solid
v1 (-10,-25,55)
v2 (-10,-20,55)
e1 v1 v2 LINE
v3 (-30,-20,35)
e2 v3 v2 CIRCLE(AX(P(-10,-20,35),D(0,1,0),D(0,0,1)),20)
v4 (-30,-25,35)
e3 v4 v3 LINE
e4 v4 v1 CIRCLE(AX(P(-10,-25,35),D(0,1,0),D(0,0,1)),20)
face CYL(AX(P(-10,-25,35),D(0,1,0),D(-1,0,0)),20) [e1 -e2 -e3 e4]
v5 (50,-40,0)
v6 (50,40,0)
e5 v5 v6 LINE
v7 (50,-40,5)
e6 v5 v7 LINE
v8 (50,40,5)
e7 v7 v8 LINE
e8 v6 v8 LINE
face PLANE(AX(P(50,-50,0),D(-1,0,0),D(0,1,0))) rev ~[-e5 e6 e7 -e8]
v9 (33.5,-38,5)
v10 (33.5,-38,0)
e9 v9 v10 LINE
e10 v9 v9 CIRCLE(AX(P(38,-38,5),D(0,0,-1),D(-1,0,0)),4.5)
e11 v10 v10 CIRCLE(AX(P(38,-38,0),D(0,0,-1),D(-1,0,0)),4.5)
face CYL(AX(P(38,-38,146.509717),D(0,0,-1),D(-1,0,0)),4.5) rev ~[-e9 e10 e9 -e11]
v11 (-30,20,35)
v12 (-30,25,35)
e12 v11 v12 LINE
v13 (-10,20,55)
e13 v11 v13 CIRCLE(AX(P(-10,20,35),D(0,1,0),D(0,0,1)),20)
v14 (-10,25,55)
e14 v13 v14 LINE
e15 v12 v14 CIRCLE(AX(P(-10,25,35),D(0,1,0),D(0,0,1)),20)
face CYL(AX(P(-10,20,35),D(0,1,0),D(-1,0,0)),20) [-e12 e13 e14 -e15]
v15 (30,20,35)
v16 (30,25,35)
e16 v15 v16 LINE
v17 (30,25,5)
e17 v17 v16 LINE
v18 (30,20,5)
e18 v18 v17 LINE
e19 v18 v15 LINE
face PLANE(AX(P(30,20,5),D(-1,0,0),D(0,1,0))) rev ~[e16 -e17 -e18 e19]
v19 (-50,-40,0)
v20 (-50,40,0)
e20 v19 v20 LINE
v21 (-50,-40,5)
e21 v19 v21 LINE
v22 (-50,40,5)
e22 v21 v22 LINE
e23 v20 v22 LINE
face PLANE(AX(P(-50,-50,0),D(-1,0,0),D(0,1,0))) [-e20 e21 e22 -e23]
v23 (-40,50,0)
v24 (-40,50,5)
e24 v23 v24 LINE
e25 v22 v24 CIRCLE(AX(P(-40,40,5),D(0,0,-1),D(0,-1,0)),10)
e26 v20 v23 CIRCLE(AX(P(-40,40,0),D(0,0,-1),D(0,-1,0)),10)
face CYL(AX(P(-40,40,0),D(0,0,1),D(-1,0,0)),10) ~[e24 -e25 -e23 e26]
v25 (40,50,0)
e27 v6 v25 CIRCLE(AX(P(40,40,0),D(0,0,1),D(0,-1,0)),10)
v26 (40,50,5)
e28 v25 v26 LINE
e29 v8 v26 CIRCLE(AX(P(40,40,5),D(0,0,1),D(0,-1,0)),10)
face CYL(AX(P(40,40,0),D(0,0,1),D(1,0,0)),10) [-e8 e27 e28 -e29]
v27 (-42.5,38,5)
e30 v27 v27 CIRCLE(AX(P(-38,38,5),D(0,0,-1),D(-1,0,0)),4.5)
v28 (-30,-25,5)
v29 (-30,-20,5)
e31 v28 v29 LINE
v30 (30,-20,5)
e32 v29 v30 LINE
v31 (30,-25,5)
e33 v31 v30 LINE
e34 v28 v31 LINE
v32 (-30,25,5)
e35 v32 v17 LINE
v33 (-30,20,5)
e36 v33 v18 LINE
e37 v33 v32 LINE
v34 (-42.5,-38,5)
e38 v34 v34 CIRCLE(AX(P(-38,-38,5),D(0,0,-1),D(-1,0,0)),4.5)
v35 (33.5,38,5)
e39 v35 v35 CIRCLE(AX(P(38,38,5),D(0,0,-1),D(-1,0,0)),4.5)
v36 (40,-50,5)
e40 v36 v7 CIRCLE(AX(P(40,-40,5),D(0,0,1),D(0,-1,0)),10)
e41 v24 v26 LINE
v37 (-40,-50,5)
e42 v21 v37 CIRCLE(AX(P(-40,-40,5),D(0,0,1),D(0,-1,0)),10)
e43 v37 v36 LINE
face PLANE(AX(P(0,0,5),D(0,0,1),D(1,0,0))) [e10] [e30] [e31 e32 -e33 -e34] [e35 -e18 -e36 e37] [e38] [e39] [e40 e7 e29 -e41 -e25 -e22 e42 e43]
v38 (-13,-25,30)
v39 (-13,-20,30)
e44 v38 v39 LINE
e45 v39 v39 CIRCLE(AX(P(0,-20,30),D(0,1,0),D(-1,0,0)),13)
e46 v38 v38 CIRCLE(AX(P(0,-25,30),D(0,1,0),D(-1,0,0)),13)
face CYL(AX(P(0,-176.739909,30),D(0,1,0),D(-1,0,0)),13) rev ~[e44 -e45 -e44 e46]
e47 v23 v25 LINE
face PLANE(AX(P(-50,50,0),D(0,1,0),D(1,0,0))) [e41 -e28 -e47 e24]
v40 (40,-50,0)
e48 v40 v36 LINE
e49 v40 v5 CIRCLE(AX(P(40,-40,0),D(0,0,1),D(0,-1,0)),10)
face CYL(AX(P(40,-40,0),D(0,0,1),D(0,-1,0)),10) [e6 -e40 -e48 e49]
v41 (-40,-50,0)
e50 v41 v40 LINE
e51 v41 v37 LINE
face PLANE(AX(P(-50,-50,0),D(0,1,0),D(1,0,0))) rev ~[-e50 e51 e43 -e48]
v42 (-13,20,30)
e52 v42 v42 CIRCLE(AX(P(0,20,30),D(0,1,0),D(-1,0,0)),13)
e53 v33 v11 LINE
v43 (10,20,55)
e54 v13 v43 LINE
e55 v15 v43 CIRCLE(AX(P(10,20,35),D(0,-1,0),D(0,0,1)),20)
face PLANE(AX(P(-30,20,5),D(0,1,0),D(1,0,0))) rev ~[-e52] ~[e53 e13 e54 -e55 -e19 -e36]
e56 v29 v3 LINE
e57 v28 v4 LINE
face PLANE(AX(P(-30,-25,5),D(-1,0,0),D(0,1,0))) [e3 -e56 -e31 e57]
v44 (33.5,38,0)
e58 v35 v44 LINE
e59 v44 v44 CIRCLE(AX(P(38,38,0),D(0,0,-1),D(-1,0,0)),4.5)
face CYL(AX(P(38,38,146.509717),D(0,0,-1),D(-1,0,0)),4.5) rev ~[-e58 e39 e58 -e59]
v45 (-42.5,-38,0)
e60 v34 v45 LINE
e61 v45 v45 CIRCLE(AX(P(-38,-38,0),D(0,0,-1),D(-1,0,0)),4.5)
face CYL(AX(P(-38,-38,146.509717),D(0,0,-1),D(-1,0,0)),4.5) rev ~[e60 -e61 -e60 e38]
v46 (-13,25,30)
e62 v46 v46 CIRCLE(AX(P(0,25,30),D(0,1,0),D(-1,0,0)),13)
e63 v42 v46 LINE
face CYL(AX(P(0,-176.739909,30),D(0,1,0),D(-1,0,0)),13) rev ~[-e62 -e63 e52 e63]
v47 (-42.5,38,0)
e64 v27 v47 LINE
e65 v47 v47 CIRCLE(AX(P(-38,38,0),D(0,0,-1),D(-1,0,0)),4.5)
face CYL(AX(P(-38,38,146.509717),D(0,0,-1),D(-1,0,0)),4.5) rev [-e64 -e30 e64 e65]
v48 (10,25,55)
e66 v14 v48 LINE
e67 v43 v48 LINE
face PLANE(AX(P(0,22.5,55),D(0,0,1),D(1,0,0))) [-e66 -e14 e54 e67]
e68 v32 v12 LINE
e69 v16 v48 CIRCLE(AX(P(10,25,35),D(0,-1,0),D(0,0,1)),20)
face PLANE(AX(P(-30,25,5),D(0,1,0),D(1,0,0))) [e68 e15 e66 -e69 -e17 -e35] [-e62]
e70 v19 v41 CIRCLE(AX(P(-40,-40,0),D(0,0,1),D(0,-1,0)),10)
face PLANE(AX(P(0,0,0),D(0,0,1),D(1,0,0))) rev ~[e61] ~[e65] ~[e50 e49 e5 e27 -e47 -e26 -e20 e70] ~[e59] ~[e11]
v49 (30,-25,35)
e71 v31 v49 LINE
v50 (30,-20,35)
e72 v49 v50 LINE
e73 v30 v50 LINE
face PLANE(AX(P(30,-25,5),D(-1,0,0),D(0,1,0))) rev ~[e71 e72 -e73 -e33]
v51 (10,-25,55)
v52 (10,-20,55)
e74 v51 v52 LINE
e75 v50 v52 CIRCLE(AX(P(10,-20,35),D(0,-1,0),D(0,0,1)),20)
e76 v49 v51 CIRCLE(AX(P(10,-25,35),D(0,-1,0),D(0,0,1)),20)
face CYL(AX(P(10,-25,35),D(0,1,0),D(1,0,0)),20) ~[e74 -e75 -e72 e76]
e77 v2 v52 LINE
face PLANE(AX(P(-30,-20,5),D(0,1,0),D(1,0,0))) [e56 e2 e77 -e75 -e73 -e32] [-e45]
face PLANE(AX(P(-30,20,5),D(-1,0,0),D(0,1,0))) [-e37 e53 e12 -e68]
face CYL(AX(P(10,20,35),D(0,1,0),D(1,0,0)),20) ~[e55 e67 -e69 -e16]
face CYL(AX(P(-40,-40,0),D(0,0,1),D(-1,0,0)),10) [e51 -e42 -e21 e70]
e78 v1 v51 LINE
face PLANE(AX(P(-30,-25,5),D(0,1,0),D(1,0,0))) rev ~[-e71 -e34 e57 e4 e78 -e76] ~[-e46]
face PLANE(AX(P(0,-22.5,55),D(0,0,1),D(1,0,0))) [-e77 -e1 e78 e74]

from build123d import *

# Parameters (mm, degrees)
F1_W     = 100
F1_H     = 100
F2_DEPTH = 5
F3_R     = 10
F5_D     = 9
F6_W     = 60
F6_H     = 5
F7_DEPTH = 50
F8_R     = 20
F10_D    = 26


# Not quite as in the source:
# - a pattern or mirror of a feature is missing from the dataset's text; its kind, count and spacing are read off the source's solid


with BuildPart() as f2:
    # F1 (on Top) → F2 (new body)
    with BuildSketch(Plane.XY):
        Rectangle(F1_W, F1_H)
    extrude(amount=F2_DEPTH)

    # F3
    f3_edges = [f2.edges().sort_by_distance(p)[0] for p in [
        (-50, 50, 2.5),
        (-50, -50, 2.5),
        (50, -50, 2.5),
        (50, 50, 2.5),
    ]]
    fillet(f3_edges, radius=F3_R)

    # F5 (through all)
    with Locations(Plane.XY.offset(5)):
        with Locations((-38, -38), (38, -38), (-38, -38), (38, 38)):
            f5 = Hole(F5_D / 2)

    # F5_copies: F5 across plane
    add(f5.mirror(Plane.ZX), mode=Mode.SUBTRACT)

    # F6 (on face) → F7 (join)
    with BuildSketch(Plane.XY.offset(5)):
        with Locations((0, -22.5)):
            Rectangle(F6_W, F6_H)
        with Locations((0, 22.5)):
            Rectangle(F6_W, F6_H)
    extrude(amount=F7_DEPTH)

    # F8
    f8_edges = [f2.edges().sort_by_distance(p)[0] for p in [
        (-30, -22.5, 55),
        (-30, 22.5, 55),
        (30, 22.5, 55),
        (30, -22.5, 55),
    ]]
    fillet(f8_edges, radius=F8_R)

    # F10 (through all)
    with Locations(Plane.XZ.offset(25)):
        with Locations((0, 30)):
            Hole(F10_D / 2)


solid = f2.part
